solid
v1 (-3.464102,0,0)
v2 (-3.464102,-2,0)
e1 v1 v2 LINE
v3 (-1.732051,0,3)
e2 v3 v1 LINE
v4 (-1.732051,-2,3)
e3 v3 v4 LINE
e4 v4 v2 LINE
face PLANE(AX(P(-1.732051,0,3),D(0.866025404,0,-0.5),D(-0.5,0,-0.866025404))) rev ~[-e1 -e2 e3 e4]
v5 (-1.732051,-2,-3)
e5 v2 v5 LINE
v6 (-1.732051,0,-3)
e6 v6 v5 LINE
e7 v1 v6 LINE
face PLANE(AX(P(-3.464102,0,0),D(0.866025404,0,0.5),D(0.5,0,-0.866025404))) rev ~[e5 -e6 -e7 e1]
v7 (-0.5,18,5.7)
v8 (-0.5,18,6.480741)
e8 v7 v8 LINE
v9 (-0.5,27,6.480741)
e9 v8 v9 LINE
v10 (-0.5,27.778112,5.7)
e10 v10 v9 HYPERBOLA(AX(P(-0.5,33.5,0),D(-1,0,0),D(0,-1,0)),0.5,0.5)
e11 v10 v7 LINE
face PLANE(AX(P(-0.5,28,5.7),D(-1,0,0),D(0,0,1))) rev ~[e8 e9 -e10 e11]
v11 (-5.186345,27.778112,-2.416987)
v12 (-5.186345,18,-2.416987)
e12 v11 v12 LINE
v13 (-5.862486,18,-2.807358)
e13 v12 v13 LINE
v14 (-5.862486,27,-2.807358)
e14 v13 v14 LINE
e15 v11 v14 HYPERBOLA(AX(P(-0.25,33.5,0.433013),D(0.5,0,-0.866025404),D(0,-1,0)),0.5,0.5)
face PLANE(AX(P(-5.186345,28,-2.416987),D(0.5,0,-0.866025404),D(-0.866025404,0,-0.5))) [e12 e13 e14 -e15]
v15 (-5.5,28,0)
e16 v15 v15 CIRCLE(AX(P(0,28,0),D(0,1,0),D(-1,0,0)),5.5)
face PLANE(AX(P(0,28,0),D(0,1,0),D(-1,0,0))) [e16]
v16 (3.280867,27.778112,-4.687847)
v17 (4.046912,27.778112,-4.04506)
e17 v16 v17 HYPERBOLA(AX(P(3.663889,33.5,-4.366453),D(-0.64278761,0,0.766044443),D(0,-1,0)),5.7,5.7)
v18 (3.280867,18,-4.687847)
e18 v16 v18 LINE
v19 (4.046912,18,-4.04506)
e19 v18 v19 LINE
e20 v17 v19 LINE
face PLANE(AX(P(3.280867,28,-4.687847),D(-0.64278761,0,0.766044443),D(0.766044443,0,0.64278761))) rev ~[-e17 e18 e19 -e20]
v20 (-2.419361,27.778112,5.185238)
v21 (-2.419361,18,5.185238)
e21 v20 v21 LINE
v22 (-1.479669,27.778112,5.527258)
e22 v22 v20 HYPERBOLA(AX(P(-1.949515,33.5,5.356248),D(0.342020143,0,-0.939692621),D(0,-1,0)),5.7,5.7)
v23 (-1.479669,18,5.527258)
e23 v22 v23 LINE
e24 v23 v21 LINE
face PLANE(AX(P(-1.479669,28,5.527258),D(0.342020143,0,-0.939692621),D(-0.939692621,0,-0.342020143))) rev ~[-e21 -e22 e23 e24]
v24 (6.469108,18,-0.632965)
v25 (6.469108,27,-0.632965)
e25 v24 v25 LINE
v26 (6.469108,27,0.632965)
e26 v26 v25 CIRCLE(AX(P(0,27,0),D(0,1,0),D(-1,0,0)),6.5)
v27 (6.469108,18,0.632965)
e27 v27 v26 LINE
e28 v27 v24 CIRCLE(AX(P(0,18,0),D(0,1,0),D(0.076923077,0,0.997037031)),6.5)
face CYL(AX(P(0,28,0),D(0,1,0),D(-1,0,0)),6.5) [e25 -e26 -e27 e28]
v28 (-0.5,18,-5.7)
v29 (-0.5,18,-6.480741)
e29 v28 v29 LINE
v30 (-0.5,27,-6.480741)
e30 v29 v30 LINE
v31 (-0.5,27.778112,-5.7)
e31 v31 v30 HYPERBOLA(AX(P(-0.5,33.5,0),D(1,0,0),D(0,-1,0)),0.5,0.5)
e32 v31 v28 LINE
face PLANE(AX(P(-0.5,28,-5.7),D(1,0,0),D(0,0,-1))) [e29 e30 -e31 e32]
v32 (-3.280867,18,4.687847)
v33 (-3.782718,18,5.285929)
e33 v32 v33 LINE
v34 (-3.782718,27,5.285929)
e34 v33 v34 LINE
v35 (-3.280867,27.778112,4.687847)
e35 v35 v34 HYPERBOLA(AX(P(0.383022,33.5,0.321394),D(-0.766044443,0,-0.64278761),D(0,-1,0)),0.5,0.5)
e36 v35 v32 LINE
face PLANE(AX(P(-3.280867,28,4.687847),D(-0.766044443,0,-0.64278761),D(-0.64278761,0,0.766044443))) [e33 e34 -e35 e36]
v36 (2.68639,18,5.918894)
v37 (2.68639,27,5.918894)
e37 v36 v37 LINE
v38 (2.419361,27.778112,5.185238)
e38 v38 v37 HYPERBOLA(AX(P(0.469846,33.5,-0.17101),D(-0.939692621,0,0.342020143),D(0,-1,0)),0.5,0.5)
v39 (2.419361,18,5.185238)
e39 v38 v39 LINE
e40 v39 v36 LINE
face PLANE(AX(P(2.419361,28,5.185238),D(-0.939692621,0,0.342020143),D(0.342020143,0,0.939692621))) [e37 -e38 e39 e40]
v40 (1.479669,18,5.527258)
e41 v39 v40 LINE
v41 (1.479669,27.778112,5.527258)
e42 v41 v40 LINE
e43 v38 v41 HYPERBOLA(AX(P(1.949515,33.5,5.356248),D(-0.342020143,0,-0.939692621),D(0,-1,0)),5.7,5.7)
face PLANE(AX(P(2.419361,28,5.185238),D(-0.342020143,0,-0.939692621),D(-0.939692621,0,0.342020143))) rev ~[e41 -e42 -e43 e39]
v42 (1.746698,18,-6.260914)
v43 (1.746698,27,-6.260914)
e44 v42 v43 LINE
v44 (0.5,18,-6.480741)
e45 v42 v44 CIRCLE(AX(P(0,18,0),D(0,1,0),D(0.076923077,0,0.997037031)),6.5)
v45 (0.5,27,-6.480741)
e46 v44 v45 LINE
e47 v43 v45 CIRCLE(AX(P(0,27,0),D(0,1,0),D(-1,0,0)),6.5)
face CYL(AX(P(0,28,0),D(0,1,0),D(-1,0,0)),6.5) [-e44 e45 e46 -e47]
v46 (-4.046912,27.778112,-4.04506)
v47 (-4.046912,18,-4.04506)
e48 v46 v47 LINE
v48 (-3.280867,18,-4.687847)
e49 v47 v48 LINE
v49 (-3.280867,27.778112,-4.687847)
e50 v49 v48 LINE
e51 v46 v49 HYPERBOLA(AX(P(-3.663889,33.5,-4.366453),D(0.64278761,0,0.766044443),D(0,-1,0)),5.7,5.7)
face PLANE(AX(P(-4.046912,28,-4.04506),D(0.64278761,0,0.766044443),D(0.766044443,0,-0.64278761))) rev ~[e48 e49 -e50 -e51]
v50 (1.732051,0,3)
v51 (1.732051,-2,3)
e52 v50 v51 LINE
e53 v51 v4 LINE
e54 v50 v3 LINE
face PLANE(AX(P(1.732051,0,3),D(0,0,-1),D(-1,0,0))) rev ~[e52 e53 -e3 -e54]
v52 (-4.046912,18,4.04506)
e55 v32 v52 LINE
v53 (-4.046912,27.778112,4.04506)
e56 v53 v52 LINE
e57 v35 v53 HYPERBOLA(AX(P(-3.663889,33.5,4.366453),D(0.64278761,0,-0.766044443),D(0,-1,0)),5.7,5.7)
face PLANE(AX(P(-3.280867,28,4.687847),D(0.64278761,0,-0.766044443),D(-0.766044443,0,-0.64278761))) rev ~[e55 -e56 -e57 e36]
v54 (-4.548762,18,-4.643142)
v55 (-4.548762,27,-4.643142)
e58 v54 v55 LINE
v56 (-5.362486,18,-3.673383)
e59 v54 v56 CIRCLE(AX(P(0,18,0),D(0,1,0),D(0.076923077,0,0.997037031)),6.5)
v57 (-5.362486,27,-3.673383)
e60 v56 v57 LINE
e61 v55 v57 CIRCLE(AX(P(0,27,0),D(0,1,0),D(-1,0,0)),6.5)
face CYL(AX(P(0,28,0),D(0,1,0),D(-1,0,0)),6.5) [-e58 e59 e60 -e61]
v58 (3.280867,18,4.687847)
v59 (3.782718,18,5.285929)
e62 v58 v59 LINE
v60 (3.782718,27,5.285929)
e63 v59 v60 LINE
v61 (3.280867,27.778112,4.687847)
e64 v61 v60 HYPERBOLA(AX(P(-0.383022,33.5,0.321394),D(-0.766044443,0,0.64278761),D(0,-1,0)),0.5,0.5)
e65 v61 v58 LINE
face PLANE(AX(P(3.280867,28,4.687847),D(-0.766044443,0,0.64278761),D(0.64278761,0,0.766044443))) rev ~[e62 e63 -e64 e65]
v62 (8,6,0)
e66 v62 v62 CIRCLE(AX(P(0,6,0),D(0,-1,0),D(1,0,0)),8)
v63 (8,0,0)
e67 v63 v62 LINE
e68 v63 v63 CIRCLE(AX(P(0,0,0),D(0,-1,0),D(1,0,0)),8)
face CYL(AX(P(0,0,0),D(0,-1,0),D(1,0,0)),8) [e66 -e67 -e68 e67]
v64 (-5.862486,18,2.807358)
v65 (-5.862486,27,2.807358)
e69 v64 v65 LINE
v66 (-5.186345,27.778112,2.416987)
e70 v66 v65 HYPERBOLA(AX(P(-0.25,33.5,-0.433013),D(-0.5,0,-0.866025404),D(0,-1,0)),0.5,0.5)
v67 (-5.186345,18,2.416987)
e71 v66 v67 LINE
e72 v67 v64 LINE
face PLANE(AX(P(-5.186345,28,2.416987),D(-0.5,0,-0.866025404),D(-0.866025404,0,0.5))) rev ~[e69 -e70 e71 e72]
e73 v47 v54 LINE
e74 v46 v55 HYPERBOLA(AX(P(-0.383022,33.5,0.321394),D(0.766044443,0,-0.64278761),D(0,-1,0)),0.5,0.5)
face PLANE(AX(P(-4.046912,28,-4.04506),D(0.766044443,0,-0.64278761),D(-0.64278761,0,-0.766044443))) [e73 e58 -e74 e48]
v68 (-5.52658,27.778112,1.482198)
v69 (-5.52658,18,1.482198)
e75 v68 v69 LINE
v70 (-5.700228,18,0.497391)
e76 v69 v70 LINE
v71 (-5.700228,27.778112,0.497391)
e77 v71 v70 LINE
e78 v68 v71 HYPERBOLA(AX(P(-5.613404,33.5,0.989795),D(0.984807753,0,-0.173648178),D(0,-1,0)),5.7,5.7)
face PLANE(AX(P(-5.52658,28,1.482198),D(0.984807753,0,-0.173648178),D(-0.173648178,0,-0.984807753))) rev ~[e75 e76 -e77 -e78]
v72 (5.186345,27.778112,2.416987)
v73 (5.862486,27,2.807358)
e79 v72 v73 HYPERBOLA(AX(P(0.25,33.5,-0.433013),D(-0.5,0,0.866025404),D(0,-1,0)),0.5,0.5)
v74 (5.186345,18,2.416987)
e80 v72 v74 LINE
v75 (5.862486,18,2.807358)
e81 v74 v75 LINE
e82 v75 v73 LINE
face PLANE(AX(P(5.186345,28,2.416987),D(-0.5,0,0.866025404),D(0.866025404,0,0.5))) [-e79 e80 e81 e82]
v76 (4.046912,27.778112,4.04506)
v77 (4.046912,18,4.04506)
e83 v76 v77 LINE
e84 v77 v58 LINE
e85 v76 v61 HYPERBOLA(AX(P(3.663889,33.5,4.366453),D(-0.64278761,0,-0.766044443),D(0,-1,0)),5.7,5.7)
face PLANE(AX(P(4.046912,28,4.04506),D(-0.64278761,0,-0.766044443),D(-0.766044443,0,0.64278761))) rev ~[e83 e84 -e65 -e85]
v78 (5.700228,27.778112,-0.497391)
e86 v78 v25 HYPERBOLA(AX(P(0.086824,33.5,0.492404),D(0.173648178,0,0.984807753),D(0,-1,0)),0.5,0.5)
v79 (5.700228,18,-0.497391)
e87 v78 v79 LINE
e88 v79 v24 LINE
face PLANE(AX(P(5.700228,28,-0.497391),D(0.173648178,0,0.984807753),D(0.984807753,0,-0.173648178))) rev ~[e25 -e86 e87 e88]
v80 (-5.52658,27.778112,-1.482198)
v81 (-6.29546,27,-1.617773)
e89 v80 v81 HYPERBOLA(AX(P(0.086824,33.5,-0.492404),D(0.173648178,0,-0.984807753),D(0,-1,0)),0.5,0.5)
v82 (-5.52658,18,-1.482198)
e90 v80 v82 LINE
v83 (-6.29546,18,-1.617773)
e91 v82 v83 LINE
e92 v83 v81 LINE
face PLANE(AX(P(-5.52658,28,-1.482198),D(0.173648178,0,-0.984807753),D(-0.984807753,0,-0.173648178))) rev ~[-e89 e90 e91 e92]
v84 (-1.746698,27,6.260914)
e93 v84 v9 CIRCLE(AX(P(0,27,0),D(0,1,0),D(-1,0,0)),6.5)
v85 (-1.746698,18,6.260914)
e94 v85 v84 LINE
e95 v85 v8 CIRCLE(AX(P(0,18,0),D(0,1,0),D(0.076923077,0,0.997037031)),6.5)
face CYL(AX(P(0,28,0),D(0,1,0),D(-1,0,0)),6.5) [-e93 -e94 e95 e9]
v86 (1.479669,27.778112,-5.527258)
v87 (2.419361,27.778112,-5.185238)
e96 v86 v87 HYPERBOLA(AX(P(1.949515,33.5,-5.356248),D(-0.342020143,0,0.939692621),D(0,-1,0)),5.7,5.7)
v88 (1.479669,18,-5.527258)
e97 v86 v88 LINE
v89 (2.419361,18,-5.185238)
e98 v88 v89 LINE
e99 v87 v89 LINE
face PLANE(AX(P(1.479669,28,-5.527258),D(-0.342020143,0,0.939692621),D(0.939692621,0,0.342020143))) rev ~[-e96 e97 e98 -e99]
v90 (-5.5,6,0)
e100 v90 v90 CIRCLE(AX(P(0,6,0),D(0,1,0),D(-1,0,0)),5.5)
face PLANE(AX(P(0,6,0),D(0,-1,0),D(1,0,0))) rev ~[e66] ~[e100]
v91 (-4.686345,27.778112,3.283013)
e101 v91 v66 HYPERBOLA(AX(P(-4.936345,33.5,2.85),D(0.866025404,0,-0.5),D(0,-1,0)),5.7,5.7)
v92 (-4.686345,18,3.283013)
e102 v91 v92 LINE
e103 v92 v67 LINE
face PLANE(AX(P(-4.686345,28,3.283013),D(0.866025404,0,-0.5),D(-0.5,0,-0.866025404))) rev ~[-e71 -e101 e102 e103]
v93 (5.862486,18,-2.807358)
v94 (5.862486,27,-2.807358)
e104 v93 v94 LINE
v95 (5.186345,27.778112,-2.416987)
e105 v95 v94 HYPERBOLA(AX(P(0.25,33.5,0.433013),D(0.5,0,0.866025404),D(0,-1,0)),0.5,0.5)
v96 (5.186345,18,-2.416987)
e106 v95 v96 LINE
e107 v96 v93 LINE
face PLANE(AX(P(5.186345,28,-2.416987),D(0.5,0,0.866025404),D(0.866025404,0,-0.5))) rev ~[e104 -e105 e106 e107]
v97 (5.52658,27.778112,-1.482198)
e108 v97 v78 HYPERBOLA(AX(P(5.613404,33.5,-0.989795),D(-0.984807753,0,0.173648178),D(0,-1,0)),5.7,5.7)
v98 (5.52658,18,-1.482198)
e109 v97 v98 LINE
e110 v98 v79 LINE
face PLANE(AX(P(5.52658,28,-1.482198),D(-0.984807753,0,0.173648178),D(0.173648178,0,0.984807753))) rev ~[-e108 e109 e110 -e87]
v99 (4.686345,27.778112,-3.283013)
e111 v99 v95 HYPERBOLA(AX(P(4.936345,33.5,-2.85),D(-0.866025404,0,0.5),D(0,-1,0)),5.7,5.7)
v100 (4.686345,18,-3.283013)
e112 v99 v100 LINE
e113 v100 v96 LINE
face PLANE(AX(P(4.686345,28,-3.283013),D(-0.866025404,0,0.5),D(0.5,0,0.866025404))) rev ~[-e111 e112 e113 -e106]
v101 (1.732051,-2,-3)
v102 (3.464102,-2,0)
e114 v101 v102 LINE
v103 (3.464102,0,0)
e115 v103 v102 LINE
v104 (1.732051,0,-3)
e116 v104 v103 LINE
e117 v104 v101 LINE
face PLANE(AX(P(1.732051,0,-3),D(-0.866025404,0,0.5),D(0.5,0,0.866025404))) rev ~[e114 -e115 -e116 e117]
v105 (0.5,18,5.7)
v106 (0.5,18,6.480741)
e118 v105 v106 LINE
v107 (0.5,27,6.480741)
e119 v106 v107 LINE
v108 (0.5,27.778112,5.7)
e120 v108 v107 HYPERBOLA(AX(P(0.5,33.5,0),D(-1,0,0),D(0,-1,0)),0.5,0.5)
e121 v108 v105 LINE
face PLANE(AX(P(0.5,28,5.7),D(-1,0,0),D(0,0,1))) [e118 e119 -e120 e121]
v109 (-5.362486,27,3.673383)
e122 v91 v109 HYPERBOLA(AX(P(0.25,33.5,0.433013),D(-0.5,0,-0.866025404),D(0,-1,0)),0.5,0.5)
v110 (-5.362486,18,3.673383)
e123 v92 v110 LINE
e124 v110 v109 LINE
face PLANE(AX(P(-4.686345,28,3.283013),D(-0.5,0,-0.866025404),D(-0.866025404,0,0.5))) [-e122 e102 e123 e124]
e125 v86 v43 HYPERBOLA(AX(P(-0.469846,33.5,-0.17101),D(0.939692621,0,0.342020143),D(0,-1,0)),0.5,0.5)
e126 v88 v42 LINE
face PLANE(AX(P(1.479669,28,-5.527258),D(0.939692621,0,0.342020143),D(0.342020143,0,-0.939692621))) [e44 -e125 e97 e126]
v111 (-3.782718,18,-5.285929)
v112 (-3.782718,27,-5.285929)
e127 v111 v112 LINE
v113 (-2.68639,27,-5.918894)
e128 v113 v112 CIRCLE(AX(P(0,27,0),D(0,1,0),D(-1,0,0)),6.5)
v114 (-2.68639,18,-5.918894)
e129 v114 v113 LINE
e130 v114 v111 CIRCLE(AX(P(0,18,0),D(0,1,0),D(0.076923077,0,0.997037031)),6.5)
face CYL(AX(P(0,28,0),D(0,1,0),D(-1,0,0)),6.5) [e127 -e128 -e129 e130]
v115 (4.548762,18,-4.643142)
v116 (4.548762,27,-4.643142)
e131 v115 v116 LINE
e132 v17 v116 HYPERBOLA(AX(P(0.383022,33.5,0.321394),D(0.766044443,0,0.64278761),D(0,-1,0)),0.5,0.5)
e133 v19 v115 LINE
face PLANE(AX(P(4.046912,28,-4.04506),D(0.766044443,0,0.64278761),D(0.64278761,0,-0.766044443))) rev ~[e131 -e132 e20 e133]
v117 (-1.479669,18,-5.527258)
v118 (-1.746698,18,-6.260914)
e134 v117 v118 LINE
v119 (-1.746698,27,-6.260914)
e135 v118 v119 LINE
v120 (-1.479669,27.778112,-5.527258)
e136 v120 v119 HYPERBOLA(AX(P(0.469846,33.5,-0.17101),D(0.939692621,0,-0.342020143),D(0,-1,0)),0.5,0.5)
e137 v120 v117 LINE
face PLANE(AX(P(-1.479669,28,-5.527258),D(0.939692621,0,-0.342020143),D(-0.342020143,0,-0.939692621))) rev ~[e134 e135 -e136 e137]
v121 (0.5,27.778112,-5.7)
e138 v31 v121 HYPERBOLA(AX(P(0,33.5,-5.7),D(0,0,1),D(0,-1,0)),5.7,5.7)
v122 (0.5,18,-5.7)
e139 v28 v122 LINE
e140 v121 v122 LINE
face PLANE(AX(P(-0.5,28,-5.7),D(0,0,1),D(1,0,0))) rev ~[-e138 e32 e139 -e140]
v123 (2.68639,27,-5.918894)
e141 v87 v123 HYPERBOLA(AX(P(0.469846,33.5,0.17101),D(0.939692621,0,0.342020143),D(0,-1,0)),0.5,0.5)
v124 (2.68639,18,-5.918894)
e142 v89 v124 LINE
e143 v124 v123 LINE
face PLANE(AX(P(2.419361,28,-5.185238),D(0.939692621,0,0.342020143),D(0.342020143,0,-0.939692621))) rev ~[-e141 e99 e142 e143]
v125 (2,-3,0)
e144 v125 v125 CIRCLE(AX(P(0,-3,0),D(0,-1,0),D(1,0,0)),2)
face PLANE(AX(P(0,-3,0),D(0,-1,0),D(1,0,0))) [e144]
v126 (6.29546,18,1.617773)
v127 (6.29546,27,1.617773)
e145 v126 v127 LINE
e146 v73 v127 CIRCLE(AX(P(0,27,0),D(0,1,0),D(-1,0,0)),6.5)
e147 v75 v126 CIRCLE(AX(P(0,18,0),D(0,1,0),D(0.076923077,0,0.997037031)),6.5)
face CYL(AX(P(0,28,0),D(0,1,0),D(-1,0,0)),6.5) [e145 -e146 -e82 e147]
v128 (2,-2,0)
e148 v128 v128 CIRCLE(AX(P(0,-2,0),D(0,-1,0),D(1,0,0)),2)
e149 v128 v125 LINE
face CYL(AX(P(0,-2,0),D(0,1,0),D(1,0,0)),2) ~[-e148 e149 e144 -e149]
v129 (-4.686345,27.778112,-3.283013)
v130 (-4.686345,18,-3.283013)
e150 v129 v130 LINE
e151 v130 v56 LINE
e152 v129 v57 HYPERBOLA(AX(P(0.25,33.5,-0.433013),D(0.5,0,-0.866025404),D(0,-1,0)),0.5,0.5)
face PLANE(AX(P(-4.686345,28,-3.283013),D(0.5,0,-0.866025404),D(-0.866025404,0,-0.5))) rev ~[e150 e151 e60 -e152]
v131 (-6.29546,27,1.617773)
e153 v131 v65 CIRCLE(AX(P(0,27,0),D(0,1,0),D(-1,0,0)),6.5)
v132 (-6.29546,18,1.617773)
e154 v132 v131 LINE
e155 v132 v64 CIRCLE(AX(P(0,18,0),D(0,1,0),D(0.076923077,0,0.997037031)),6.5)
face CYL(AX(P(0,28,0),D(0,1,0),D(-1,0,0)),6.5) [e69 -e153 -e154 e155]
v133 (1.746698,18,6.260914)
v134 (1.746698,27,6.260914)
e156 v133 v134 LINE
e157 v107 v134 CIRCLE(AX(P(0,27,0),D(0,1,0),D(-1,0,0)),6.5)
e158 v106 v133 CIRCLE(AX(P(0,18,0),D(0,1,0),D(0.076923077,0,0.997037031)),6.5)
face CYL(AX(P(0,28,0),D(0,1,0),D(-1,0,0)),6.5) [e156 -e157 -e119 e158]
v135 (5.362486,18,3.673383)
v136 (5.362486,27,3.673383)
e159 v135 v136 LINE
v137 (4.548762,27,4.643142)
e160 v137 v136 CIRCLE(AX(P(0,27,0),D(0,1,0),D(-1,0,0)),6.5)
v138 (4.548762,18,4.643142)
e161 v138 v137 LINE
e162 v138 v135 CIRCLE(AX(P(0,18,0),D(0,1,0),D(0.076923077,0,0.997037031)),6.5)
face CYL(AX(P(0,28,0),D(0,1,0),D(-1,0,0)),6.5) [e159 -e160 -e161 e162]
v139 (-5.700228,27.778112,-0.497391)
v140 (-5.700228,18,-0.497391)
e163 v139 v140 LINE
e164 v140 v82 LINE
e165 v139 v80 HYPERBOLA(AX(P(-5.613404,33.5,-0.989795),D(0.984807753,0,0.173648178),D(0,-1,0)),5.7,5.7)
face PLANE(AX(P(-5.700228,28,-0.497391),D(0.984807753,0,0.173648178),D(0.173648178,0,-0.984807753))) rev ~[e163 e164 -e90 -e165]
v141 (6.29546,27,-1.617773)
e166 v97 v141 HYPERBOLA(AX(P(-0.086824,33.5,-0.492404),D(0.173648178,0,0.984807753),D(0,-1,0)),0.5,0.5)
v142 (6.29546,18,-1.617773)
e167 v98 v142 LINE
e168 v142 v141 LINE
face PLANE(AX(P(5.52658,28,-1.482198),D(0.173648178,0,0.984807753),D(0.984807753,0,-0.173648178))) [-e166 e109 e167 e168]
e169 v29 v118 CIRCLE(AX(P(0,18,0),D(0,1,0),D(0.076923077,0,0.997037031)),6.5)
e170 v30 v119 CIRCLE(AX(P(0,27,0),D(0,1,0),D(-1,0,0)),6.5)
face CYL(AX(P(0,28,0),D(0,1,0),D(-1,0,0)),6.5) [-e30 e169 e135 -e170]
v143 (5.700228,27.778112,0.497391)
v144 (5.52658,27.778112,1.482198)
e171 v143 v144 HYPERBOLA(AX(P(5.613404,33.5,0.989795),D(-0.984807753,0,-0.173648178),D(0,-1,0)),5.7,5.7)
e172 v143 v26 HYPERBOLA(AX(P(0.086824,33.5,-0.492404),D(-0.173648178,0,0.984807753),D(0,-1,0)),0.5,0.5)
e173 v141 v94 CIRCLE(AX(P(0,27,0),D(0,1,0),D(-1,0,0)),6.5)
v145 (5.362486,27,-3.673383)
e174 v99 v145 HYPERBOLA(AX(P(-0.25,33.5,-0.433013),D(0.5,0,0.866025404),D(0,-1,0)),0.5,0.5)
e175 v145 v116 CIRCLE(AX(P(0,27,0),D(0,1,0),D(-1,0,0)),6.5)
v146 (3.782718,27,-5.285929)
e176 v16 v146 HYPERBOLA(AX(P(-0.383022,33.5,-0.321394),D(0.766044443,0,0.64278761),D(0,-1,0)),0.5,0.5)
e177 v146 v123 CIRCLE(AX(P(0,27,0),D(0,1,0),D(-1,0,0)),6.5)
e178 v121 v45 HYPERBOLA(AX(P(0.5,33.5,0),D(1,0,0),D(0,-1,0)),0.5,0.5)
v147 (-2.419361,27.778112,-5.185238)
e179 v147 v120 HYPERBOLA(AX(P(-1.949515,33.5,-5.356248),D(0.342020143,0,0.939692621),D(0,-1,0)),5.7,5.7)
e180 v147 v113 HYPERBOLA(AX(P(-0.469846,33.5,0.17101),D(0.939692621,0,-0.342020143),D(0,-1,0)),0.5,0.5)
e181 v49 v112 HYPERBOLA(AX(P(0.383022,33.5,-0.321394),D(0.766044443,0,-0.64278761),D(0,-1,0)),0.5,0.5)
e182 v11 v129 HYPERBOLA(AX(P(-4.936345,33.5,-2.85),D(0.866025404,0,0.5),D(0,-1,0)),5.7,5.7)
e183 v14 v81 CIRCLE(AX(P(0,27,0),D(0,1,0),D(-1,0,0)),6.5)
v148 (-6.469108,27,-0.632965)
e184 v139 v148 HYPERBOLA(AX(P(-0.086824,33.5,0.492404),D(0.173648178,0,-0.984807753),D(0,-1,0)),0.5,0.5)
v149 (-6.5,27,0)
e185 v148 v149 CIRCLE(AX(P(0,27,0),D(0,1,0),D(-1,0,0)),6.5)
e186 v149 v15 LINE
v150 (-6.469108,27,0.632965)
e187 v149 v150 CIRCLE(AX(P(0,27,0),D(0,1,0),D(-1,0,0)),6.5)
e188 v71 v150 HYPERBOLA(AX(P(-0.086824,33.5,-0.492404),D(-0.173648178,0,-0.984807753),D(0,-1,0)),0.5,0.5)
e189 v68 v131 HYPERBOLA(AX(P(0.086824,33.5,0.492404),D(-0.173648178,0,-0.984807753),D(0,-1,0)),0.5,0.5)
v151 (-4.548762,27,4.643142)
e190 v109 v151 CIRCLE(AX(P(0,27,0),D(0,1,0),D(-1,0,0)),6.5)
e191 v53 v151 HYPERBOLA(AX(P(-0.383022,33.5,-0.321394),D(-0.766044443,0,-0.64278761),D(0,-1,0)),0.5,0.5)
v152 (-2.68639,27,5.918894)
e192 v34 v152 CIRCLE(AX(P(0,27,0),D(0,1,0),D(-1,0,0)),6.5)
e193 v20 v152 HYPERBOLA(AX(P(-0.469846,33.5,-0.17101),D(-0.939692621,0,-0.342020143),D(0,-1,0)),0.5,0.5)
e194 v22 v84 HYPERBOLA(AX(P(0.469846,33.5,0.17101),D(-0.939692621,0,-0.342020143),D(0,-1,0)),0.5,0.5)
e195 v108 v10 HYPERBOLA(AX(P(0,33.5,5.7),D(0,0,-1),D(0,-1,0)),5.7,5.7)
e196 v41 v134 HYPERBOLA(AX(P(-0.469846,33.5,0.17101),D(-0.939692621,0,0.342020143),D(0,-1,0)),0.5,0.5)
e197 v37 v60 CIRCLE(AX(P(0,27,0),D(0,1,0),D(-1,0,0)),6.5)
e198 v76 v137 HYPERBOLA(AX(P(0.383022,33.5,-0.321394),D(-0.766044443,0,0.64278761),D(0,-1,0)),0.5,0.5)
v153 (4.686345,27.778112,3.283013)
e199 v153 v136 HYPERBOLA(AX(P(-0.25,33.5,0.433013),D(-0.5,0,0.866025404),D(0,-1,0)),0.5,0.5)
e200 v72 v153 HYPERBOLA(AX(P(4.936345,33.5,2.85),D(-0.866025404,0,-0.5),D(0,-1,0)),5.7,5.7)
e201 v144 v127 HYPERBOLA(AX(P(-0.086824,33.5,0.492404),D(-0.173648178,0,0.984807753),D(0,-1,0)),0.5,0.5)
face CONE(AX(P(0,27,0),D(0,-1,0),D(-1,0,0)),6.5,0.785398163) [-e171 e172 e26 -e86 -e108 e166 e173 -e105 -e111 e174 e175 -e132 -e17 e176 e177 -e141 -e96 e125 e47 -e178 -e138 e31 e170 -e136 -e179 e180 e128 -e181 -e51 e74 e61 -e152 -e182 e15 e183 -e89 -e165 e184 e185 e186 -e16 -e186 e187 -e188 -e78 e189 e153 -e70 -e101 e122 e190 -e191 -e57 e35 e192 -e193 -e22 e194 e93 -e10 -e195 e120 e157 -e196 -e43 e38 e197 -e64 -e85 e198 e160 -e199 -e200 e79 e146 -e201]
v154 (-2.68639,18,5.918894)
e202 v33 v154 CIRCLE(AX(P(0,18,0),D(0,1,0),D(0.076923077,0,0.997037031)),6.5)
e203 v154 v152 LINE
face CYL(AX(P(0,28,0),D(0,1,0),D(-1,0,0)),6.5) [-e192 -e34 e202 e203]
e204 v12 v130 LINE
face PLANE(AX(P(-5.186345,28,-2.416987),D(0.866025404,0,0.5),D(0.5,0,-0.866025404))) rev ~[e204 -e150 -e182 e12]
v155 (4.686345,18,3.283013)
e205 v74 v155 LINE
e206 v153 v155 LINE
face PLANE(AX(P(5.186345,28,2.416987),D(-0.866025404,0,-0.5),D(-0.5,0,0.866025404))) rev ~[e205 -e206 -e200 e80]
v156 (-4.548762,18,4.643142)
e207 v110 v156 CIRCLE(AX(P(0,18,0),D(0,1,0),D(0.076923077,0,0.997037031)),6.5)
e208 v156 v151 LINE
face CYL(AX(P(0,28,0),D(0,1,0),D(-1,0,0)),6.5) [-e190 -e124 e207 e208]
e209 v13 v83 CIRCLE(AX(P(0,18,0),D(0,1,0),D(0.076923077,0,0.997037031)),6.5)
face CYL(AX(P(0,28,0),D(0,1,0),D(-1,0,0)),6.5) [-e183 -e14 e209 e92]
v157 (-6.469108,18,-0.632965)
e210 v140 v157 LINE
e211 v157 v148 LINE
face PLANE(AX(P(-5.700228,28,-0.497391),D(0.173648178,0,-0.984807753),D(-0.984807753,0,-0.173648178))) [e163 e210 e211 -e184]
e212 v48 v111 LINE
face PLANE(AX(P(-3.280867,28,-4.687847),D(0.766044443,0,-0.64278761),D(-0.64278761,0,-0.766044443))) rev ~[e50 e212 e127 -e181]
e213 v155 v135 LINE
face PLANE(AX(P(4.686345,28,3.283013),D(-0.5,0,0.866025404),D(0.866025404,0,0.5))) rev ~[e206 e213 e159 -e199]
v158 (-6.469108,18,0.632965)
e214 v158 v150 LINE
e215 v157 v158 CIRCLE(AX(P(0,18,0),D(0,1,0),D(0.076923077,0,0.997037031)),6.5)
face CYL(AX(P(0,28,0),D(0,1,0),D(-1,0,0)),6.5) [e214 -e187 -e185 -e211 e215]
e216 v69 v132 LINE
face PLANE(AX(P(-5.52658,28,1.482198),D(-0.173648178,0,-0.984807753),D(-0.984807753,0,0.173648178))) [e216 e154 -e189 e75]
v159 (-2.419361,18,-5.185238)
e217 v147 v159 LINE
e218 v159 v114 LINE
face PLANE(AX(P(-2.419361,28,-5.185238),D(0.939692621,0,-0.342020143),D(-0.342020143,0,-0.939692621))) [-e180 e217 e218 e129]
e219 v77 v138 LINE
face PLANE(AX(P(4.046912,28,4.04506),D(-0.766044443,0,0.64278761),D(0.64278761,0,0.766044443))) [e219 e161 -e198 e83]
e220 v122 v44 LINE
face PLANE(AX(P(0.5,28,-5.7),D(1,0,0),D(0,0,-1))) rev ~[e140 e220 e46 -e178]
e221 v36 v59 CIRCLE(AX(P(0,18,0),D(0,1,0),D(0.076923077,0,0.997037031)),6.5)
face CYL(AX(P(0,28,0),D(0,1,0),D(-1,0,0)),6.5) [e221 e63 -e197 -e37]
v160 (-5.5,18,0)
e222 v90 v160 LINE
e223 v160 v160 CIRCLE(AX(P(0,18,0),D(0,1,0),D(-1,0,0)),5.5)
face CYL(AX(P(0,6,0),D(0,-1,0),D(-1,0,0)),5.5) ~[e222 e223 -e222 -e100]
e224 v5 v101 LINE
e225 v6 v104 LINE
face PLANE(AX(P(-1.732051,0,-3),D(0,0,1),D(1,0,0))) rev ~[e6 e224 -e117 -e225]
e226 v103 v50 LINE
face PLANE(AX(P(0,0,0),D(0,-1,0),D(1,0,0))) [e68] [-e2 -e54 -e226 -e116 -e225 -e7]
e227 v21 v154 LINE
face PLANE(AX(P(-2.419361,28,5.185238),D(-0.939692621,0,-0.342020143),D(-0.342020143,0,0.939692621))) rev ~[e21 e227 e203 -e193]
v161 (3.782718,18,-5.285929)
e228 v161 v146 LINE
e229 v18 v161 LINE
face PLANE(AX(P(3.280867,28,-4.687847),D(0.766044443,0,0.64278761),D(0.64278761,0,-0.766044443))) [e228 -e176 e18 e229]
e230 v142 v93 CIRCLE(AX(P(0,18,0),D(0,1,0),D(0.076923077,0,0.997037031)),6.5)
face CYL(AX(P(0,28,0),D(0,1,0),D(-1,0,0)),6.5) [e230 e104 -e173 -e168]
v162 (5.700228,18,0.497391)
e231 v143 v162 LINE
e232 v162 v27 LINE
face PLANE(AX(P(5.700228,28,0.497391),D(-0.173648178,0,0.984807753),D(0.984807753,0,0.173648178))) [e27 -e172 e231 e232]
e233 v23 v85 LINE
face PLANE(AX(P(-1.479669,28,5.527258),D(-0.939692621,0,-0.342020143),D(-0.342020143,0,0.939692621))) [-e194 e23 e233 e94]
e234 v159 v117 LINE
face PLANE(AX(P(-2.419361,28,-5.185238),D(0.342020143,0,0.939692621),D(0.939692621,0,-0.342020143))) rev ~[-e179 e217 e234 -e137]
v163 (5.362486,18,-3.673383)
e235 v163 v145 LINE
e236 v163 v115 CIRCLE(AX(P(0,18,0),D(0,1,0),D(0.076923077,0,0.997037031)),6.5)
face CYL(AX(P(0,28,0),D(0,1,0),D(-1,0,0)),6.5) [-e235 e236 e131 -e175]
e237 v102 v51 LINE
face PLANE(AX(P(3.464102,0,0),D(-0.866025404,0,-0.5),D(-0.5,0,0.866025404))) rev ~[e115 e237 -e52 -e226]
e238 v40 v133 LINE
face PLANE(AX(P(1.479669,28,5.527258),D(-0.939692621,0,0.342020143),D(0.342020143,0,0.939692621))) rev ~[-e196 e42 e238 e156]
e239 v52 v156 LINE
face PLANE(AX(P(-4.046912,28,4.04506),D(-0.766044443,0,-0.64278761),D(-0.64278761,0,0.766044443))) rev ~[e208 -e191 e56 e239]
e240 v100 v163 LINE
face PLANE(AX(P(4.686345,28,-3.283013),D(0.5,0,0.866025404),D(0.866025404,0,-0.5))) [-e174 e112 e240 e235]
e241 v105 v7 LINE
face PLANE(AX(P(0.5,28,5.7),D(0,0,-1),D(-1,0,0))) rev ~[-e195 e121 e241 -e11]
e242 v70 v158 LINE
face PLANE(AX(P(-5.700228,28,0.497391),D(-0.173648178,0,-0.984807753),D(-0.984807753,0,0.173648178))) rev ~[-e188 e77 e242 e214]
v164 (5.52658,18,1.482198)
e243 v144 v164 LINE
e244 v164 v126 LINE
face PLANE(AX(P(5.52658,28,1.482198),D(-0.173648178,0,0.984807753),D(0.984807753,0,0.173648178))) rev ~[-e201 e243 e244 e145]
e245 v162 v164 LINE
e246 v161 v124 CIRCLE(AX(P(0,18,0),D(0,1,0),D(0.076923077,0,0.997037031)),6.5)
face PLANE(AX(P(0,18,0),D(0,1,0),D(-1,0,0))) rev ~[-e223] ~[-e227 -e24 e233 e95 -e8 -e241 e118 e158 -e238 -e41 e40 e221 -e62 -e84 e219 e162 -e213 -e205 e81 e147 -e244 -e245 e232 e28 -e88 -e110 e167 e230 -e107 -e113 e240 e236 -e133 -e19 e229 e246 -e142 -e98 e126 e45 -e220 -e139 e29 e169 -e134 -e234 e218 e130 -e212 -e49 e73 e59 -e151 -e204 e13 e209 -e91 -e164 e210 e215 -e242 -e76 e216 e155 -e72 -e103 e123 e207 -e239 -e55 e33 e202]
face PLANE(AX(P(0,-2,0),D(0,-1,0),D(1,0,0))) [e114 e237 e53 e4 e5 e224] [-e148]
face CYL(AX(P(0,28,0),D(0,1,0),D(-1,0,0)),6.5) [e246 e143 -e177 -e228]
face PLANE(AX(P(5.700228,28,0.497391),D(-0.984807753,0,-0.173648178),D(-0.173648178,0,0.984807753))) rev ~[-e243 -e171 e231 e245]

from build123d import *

# Parameters (mm, degrees)
F0_R             = 8
F1_DEPTH         = 6
F3_DEPTH         = 2
F4_R             = 2
F5_DEPTH         = 1
F6_R             = 5.5
F7_DEPTH         = 22
F8_R             = 6.5
F8_R_2           = 5.5
F9_DEPTH         = 10
F10_SIZE         = 1
F11_W            = 1
F11_H            = 2
F12_DEPTH        = 20
F12_COPIES_COUNT = 18


# Not quite as in the source:
# - a pattern or mirror of a feature is missing from the dataset's text; its kind, count and spacing are read off the source's solid


with BuildPart() as f1:
    # F0 (on Front) → F1 (new body)
    with BuildSketch(Plane.XZ):
        Circle(F0_R)
    extrude(amount=-F1_DEPTH)

    # F2 (on face) → F3 (join)
    with BuildSketch(Plane.XZ):
        Polygon((1.7320508076, -3), (3.4641016151, 0), (1.7320508076, 3), (-1.7320508076, 3), (-3.4641016151, 0), (-1.7320508076, -3), align=None)
    extrude(amount=F3_DEPTH)

    # F4 (on face) → F5 (join)
    with BuildSketch(Plane.XZ.offset(2)):
        Circle(F4_R)
    extrude(amount=F5_DEPTH)

    # F6 (on face) → F7 (join)
    with BuildSketch(Plane(origin=(0, 6, 0), x_dir=(-1, 0, 0), z_dir=(0, 1, 0))):
        Circle(F6_R)
    extrude(amount=F7_DEPTH)

    # F8 (on face) → F9 (join)
    with BuildSketch(Plane(origin=(0, 28, 0), x_dir=(-1, 0, 0), z_dir=(0, 1, 0))):
        Circle(F8_R)
        Circle(F8_R_2, mode=Mode.SUBTRACT)
    extrude(amount=-F9_DEPTH)

    # F10
    f10_edges = [f1.edges().sort_by_distance(p)[0] for p in [
        (6.5, 28, 0),
    ]]
    chamfer(f10_edges, length=F10_SIZE)

    # F11 (on face) → F12 (cut)
    with BuildSketch(Plane(origin=(0, 28, 0), x_dir=(-1, 0, 0), z_dir=(0, 1, 0))):
        with Locations((0, 6.7)):
            Rectangle(F11_W, F11_H)
    f12 = extrude(amount=-F12_DEPTH, mode=Mode.SUBTRACT)

    # F12_copies: F12 ×18 about axis
    f12_copies_axis = Axis((0, 0, 0), (0, 1, 0))
    for i in range(1, F12_COPIES_COUNT):
        add(f12.rotate(f12_copies_axis, i * 360 / F12_COPIES_COUNT), mode=Mode.SUBTRACT)


solid = f1.part
